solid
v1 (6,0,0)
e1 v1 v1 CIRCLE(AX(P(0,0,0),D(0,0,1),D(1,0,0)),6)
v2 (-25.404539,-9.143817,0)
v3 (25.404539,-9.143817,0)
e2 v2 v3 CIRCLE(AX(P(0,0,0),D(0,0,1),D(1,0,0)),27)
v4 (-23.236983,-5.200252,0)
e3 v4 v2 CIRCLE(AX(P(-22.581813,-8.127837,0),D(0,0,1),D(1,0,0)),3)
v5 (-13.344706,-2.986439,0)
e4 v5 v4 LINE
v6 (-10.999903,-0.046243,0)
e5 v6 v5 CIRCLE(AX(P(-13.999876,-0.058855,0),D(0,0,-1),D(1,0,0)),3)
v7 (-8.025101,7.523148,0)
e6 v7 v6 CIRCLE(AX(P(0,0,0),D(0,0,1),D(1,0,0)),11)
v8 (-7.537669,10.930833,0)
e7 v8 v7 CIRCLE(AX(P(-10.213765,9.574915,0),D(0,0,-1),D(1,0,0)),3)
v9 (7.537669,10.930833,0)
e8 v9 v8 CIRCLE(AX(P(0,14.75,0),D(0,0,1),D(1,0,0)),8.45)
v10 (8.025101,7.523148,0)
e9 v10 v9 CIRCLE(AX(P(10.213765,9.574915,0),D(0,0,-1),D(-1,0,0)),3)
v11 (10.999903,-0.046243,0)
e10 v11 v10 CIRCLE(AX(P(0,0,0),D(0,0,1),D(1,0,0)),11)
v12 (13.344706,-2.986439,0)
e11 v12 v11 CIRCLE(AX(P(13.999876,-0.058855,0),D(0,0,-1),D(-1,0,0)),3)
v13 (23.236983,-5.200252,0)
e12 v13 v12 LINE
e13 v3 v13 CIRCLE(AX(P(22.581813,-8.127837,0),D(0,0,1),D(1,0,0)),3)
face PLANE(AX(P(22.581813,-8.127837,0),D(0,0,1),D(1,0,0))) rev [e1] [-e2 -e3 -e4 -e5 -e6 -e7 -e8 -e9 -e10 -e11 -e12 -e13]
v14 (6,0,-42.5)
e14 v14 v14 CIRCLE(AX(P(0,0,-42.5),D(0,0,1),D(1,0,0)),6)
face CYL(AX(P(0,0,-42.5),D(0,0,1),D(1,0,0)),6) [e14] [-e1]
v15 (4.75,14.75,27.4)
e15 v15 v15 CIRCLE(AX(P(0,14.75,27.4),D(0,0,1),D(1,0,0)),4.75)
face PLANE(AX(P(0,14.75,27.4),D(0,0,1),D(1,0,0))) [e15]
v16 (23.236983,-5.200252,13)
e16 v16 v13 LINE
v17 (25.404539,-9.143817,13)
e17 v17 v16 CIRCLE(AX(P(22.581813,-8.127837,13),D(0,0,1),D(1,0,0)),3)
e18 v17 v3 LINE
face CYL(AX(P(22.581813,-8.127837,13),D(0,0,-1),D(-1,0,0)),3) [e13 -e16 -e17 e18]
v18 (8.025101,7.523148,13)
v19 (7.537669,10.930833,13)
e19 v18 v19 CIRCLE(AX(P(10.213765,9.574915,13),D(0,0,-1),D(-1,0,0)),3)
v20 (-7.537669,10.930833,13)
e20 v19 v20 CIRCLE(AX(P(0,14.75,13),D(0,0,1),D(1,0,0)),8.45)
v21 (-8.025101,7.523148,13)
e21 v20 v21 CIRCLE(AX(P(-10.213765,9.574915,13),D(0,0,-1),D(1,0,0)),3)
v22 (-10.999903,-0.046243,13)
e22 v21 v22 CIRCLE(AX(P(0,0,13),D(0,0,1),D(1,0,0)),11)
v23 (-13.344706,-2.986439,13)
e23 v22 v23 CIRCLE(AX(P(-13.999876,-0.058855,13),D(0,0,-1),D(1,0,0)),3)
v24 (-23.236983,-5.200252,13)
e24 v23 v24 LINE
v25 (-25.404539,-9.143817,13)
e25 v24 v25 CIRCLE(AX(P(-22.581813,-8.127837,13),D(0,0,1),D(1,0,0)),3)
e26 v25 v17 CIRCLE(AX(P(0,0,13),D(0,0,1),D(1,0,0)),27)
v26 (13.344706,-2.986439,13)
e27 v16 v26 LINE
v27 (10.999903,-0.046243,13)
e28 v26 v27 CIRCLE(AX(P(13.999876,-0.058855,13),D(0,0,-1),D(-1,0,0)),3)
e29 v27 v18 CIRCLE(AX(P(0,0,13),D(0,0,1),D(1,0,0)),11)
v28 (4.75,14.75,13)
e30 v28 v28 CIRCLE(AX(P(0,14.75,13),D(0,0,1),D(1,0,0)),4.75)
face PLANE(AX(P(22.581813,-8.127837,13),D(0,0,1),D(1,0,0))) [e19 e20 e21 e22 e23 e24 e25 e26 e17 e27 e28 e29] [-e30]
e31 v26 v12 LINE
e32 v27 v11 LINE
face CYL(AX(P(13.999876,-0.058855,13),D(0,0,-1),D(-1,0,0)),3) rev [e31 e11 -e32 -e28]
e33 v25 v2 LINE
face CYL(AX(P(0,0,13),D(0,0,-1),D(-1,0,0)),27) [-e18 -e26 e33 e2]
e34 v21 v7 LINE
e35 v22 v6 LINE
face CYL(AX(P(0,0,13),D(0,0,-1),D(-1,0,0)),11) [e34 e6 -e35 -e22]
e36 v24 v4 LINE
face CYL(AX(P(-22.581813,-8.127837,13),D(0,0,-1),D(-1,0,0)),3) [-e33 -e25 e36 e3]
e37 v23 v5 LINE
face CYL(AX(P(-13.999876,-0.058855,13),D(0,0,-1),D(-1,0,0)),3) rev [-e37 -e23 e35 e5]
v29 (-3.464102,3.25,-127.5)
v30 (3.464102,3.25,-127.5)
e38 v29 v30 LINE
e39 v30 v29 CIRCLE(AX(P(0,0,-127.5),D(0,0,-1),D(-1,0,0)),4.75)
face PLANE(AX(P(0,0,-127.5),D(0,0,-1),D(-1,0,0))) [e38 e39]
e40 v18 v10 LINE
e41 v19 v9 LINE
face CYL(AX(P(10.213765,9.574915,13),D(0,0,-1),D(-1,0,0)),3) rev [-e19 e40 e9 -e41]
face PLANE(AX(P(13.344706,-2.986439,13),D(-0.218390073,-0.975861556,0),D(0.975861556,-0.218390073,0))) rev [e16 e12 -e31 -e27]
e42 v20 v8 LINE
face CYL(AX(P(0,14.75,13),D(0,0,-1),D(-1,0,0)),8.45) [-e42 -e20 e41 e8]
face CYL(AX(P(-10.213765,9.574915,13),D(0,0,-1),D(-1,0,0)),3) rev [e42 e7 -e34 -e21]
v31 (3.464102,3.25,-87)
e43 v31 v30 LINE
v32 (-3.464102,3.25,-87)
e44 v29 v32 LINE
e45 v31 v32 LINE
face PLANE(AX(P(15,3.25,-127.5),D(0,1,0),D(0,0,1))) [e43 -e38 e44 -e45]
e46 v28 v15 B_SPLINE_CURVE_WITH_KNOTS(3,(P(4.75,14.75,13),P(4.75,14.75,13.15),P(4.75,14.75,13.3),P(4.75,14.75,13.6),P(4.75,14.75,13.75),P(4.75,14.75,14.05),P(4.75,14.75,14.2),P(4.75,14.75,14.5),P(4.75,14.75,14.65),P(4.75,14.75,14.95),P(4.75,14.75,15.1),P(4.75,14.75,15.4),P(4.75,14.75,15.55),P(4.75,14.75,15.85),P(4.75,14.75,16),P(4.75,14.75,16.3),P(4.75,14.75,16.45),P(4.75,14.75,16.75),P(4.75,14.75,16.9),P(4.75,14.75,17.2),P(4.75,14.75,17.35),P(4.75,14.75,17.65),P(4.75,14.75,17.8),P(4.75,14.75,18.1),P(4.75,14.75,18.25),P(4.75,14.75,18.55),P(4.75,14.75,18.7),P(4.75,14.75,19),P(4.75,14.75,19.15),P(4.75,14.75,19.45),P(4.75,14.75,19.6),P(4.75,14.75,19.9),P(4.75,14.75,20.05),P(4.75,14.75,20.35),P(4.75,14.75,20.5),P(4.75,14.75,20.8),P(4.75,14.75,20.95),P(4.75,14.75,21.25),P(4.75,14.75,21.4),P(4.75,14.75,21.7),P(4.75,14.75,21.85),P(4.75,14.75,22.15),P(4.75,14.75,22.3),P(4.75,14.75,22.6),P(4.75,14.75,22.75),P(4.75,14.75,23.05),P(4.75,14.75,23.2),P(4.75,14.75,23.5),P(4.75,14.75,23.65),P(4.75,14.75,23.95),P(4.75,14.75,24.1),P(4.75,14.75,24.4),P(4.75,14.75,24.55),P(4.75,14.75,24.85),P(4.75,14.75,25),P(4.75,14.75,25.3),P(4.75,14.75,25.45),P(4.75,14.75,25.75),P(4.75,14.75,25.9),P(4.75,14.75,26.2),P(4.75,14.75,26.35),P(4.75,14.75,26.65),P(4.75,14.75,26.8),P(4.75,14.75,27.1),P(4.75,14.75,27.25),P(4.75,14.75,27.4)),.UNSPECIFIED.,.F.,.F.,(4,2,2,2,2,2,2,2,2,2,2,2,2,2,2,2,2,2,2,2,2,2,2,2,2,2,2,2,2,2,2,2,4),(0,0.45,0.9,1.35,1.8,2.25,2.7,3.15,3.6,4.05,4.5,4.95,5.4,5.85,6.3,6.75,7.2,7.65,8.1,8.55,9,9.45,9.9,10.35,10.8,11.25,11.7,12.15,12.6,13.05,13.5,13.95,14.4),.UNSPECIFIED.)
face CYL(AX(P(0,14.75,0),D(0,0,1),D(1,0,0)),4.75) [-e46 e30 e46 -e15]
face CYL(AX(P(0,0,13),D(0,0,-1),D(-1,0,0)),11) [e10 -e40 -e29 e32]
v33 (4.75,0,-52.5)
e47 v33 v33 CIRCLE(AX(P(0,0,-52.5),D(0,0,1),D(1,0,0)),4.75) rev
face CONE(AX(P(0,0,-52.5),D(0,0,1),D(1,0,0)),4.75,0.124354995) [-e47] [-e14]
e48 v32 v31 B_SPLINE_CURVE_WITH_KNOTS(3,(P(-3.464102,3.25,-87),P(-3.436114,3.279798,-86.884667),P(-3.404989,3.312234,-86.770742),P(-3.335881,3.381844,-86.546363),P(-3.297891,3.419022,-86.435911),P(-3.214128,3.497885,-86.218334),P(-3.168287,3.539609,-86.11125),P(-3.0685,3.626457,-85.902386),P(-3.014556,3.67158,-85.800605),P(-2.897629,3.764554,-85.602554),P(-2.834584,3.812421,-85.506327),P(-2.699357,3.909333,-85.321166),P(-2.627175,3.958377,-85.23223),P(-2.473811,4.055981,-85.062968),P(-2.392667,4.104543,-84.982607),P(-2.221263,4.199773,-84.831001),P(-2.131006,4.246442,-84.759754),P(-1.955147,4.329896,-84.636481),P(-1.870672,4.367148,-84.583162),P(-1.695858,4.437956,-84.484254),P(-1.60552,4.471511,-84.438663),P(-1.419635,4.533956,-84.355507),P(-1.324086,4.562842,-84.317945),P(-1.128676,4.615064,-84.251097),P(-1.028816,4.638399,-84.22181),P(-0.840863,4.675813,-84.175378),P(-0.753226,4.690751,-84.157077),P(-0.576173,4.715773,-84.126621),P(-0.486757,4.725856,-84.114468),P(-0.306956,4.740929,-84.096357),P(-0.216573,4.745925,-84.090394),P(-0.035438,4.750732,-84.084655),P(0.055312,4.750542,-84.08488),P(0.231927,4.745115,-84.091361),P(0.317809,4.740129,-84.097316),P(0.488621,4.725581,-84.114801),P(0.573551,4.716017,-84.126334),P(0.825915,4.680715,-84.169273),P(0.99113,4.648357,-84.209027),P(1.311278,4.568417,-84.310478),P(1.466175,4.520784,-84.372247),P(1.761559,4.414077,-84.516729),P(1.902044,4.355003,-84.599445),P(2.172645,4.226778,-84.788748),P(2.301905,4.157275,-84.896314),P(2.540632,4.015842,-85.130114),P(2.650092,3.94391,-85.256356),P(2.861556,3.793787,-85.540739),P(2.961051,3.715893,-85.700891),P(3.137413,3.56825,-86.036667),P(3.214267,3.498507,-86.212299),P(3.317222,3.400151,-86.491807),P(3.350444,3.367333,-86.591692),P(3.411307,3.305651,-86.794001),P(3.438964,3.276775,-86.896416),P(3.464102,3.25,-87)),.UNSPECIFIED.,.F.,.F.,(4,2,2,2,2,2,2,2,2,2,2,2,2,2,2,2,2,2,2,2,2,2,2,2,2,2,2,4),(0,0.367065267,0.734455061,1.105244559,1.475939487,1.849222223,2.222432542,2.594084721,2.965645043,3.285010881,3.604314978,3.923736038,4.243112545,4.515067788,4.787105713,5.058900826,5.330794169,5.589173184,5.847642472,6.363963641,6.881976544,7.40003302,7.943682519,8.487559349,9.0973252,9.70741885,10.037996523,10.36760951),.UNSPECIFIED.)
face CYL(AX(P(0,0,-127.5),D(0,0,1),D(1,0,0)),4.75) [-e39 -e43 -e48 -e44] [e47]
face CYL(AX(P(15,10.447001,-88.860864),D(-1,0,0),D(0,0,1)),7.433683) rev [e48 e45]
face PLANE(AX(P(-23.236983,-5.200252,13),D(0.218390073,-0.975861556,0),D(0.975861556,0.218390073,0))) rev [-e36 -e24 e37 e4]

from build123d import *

# Parameters (mm, degrees)
SKETCH1_R                = 6
SKETCH1_R_2              = 4.75
BOSS_EXTRUDE1_DEPTH      = 13
BOSS_EXTRUDE2_DEPTH      = 14.4
BOSS_EXTRUDE2_DEPTH_BACK = 13
SKETCH2_R                = 4.75
BOSS_EXTRUDE3_START      = -55.5
SKETCH3_R                = 6
BOSS_EXTRUDE3_DEPTH      = 55.5
SKETCH4_R                = 4.75
BOSS_EXTRUDE4_DEPTH      = 85
CHAMFER1_SIZE2           = 10
CHAMFER1_SIZE            = 1.25
CUT_EXTRUDE1_DEPTH       = 15
CUT_EXTRUDE1_DEPTH_BACK  = 15


with BuildPart() as part:
    # Sketch1 → Boss-Extrude1 (new body)
    with BuildSketch(Plane.XY):
        with BuildLine():
            Line((-23.236982917, -5.200252391), (-13.344706072, -2.986439328))
            ThreePointArc((-13.344706072, -2.986439328), (-11.654410969, -1.929360589), (-10.999902799, -0.046242948))
            ThreePointArc((-10.999902799, -0.046242948), (-10.237754277, 4.023479509), (-8.025101164, 7.5231477))
            ThreePointArc((-8.025101164, 7.5231477), (-7.243992277, 9.150122037), (-7.537669453, 10.930832655))
            ThreePointArc((-7.537669453, 10.930832655), (0, 23.2), (7.537669453, 10.930832655))
            ThreePointArc((7.537669453, 10.930832655), (7.243992277, 9.150122037), (8.025101164, 7.5231477))
            ThreePointArc((8.025101164, 7.5231477), (10.237754277, 4.023479509), (10.999902799, -0.046242948))
            ThreePointArc((10.999902799, -0.046242948), (11.654410969, -1.929360589), (13.344706072, -2.986439328))
            Line((13.344706072, -2.986439328), (23.236982917, -5.200252391))
            ThreePointArc((23.236982917, -5.200252391), (25.210855565, -6.682799479), (25.404539286, -9.143816691))
            ThreePointArc((25.404539286, -9.143816691), (0, -27), (-25.404539286, -9.143816691))
            ThreePointArc((-25.404539286, -9.143816691), (-25.210855565, -6.682799479), (-23.236982917, -5.200252391))
        make_face()
        with Locations(Location((0, 0, 0), (0, 0, 180))):
            Circle(SKETCH1_R, mode=Mode.SUBTRACT)
        with Locations(Location((0, 14.75, 0), (0, 0, 180))):
            Circle(SKETCH1_R_2, mode=Mode.SUBTRACT)
    extrude(amount=BOSS_EXTRUDE1_DEPTH)

    # Sketch2 → Boss-Extrude2 (add, two sides: drawn at the far end of the back side and taken through both)
    with BuildSketch(Plane.XY.offset(13).offset(-BOSS_EXTRUDE2_DEPTH_BACK)):
        with Locations((0, 14.75)):
            Circle(SKETCH2_R)
    extrude(amount=BOSS_EXTRUDE2_DEPTH + BOSS_EXTRUDE2_DEPTH_BACK)

    # Sketch3 → Boss-Extrude3 (add)
    with BuildSketch(Plane.XY.offset(13).offset(BOSS_EXTRUDE3_START)):
        Circle(SKETCH3_R)
    extrude(amount=BOSS_EXTRUDE3_DEPTH)

    # Sketch4 → Boss-Extrude4 (add)
    with BuildSketch(Plane(origin=(0, 0, -42.5), x_dir=(-1, 0, 0), z_dir=(0, 0, -1))):
        Circle(SKETCH4_R)
    extrude(amount=BOSS_EXTRUDE4_DEPTH)

    # Chamfer1
    chamfer1_edges = [part.edges().sort_by_distance(p)[0] for p in [
        (4.75, 0, -42.5),
    ]]
    chamfer1_side = [part.faces().sort_by_distance(p)[0] for p in [
        (4.775, 0, -42.5),
    ]]
    chamfer(chamfer1_edges, length=CHAMFER1_SIZE - 0.0001, length2=CHAMFER1_SIZE2 - 0.0001, reference=chamfer1_side[0])  # a hair under: the kernel refuses the full size

    # Sketch5 → Cut-Extrude1 (cut, two sides: drawn at the far end of the back side and taken through both)
    with BuildSketch(Plane(origin=(0, 0, 0), x_dir=(0, 0, -1), z_dir=(1, 0, 0)).offset(-CUT_EXTRUDE1_DEPTH_BACK)):
        with BuildLine():
            Line((127.5, 3.25), (87, 3.25))
            ThreePointArc((87, 3.25), (83.953206786, 4.863584298), (81.962073187, 7.678187319))
            Line((81.962073187, 7.678187319), (127.5, 7.678187319))
            Line((127.5, 7.678187319), (127.5, 4.75))
            Line((127.5, 4.75), (127.5, 3.25))
        make_face()
    extrude(amount=CUT_EXTRUDE1_DEPTH + CUT_EXTRUDE1_DEPTH_BACK, mode=Mode.SUBTRACT)


solid = part.part
